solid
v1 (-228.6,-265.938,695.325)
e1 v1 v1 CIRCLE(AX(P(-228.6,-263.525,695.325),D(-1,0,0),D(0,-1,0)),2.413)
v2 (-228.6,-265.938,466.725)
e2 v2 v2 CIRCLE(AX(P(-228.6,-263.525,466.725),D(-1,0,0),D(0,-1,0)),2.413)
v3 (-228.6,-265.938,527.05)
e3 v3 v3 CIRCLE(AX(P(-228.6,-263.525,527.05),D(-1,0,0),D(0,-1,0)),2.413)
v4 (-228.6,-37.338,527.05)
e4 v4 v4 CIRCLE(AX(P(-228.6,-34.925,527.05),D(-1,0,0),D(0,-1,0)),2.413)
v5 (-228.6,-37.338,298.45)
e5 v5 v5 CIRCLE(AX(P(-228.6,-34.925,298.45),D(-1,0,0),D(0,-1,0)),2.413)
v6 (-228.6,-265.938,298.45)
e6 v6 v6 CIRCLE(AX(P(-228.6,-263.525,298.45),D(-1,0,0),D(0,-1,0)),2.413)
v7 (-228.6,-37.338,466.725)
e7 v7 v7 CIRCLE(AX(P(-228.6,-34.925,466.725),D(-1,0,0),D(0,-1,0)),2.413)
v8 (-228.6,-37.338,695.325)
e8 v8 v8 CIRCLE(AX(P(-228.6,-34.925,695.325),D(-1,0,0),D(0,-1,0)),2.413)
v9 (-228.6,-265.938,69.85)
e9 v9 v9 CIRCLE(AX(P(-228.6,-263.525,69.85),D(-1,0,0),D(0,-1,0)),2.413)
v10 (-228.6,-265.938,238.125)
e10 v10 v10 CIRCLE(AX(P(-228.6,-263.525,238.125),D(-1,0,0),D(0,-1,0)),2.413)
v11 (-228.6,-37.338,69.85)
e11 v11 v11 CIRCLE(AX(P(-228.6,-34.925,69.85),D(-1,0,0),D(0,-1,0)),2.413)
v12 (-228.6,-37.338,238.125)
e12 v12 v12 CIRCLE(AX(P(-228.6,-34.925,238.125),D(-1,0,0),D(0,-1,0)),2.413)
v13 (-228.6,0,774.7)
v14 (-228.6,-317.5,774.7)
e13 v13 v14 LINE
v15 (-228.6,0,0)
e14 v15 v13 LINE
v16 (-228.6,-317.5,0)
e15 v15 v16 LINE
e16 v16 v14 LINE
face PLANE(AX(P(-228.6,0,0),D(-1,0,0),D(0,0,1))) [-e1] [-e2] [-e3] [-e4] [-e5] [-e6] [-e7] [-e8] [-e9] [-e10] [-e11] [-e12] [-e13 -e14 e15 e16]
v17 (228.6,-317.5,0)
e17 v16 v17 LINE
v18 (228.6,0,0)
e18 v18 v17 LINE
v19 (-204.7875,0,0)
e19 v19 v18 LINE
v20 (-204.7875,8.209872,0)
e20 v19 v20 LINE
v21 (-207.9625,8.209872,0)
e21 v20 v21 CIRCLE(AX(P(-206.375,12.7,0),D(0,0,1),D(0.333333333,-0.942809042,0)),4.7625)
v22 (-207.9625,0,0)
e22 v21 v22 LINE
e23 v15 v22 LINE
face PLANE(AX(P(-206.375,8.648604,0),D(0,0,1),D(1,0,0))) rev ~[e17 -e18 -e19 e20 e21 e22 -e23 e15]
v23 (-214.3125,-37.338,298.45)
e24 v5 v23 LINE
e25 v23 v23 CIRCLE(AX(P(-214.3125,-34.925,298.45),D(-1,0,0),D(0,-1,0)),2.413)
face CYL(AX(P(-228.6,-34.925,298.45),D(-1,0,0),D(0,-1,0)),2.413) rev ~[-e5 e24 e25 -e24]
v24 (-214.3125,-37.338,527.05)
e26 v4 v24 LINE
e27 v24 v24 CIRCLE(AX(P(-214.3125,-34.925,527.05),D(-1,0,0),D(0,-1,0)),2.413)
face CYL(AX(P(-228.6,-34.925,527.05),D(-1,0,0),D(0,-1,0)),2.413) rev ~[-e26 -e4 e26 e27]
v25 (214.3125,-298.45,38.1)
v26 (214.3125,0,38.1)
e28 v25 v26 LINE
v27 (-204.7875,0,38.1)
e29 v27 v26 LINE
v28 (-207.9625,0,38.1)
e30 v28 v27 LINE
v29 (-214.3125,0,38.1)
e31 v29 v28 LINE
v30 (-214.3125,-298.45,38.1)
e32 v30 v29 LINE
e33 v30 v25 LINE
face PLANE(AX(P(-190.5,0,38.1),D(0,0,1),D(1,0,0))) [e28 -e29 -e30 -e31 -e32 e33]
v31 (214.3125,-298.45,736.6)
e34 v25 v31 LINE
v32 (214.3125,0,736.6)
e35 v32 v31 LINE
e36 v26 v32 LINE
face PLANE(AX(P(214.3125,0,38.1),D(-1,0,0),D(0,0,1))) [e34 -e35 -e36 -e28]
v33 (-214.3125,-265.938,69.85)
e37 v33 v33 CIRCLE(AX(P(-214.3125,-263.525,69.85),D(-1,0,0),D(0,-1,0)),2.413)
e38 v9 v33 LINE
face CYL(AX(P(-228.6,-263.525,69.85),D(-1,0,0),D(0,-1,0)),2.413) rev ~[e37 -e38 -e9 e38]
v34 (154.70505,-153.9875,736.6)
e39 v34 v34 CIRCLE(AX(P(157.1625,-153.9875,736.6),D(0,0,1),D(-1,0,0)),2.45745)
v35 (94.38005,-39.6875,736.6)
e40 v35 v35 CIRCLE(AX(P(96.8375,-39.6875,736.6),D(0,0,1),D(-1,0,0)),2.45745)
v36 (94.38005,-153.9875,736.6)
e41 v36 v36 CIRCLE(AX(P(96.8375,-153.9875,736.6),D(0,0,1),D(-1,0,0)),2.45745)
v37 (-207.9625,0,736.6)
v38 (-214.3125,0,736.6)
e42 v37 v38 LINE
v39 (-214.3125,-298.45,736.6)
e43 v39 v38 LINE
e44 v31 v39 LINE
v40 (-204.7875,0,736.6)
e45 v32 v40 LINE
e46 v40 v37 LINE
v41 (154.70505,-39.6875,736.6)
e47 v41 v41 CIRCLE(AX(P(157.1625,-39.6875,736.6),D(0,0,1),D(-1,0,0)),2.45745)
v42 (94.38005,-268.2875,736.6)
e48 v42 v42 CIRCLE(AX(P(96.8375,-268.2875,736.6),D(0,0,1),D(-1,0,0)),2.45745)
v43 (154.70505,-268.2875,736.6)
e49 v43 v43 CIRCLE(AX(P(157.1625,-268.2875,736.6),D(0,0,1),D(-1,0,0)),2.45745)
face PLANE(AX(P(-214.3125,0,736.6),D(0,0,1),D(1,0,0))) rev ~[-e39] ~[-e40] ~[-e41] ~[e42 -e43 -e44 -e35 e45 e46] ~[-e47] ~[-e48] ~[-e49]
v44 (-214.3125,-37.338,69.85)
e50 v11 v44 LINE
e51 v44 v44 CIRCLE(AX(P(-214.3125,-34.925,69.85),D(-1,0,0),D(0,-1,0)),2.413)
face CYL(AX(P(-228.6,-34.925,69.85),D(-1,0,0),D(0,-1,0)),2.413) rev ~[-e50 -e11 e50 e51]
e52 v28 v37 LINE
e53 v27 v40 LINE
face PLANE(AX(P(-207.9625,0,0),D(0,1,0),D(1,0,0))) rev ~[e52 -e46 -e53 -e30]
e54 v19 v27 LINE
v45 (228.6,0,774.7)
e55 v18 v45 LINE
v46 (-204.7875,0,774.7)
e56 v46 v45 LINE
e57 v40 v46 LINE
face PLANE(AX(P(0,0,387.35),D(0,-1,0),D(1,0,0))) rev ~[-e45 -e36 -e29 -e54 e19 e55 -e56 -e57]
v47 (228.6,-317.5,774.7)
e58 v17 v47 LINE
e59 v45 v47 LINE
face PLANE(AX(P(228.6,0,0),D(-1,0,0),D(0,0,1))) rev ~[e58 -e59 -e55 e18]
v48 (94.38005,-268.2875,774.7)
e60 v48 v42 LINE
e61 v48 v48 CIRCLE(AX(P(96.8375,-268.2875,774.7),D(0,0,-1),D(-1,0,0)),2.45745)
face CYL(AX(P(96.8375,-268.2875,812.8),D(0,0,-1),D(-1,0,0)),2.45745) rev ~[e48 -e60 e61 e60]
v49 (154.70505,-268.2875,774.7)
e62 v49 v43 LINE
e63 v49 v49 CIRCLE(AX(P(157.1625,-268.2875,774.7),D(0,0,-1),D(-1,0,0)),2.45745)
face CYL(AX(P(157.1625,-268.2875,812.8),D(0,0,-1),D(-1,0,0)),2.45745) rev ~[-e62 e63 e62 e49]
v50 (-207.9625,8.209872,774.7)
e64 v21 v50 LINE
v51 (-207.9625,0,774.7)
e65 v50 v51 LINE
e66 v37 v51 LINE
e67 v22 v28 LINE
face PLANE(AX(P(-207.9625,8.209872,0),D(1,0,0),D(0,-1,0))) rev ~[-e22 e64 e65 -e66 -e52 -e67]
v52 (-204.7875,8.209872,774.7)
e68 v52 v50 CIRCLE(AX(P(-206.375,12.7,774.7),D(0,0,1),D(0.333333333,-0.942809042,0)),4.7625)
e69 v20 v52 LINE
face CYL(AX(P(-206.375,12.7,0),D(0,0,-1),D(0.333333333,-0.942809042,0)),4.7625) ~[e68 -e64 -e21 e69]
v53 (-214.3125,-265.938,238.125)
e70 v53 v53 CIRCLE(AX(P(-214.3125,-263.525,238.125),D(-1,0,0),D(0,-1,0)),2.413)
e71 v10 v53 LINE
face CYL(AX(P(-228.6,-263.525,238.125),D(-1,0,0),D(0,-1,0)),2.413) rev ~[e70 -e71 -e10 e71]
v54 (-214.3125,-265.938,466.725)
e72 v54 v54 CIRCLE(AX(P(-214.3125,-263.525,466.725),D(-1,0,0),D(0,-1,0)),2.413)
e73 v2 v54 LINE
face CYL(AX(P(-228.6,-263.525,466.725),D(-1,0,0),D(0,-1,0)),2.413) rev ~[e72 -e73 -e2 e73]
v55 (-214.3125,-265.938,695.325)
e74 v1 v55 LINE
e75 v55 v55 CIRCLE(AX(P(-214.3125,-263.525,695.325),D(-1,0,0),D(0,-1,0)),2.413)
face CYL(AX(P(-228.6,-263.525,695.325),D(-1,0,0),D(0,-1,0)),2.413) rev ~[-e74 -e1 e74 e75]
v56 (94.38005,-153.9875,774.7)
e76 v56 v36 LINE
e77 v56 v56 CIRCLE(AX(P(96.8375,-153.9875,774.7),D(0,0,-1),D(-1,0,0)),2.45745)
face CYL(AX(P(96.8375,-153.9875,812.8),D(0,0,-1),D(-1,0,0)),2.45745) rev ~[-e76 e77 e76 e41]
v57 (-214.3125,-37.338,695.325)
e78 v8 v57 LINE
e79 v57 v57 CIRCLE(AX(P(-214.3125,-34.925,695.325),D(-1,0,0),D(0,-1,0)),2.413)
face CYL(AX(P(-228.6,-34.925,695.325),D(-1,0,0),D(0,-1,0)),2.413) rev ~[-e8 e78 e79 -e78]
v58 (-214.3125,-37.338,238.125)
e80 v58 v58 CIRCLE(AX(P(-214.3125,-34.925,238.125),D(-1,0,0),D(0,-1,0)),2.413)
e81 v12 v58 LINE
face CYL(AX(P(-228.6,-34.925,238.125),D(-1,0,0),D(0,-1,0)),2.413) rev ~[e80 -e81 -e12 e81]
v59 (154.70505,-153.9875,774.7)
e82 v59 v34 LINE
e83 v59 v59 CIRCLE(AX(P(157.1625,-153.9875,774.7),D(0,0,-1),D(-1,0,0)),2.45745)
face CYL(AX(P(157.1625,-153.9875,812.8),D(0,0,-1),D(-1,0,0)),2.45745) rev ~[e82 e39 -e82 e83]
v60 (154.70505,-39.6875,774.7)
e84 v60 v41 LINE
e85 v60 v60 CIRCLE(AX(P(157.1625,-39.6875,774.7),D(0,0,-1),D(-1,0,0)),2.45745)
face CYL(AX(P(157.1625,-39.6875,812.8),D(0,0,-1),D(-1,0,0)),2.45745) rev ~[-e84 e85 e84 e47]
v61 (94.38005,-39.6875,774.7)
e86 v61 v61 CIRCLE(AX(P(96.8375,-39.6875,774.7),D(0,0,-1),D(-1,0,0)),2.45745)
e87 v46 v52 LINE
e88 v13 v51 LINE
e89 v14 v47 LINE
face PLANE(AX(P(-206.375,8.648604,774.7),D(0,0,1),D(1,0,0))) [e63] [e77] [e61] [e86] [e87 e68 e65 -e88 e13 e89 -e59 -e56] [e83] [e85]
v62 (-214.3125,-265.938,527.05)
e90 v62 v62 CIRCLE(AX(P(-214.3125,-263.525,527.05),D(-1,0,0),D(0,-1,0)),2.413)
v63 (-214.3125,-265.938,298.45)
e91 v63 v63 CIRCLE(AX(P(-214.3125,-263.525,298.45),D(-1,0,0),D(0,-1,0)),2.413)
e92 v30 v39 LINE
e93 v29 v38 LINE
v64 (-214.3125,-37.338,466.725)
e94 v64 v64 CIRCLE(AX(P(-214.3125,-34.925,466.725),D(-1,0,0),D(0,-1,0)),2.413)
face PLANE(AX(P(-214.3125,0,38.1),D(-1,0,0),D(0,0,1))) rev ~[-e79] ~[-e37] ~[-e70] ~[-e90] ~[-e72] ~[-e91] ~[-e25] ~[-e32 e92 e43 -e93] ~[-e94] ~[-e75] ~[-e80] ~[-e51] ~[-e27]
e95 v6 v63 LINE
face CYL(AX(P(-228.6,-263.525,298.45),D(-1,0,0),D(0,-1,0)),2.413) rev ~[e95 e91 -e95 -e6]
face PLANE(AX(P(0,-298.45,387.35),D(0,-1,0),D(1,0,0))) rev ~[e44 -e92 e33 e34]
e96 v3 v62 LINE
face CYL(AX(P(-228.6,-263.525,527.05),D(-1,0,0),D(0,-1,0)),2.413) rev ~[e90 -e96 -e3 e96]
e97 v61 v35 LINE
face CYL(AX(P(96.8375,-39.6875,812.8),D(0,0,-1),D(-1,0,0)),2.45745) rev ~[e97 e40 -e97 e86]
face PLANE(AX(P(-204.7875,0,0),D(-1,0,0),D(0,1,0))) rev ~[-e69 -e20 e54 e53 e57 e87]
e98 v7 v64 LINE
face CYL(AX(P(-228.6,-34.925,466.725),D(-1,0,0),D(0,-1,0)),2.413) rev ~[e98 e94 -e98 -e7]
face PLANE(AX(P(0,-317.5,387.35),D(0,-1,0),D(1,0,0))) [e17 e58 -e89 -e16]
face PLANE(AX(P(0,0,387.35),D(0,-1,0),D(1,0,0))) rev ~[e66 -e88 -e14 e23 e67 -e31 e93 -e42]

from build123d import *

# Parameters (mm, degrees)
F0_W      = 457.2
F0_H      = 774.7
F1_DEPTH  = 317.5
F2_W      = 381
F2_H      = 698.5
F3_W      = 428.625
F3_H      = 698.5
F4_DEPTH  = 298.45
F5_START  = 19.05
F5_DEPTH  = 279.4
F7_DEPTH  = 774.7
F9_D      = 4.9149
F9_DEPTH  = 38.1
F9_TIP    = 1.4765849282
F10_R     = 2.413
F11_DEPTH = 25.4


# Not quite as in the source:
# - a feature names something its author has since deleted; it is built from what else it names


with BuildPart() as f1:
    # F0 (on Front) → F1 (new body)
    with BuildSketch(Plane.XZ):
        with Locations((0, 387.35)):
            Rectangle(F0_W, F0_H)
    extrude(amount=F1_DEPTH)

    # F2 (on Front) + F3 (on Front) → F4 (cut)
    with BuildSketch(Plane.XZ):
        with Locations((0, 387.35)):
            Rectangle(F2_W, F2_H)
    with BuildSketch(Plane.XZ):
        with Locations((0, 387.35)):
            Rectangle(F3_W, F3_H)
    extrude(amount=F4_DEPTH, mode=Mode.SUBTRACT)

    # F3 (on Front) → F5 (cut)
    with BuildSketch(Plane.XZ.offset(F5_START)):
        with Locations((0, 387.35)):
            Rectangle(F3_W, F3_H)
    extrude(amount=F5_DEPTH, mode=Mode.SUBTRACT)

    # F6 (on Top) → F7 (join, through all)
    with BuildSketch(Plane.XY):
        with BuildLine():
            Line((-204.7875, 0), (-204.7875, 8.2098719395))
            ThreePointArc((-204.7875, 8.2098719395), (-206.375, 17.4625), (-207.9625, 8.2098719395))
            Line((-207.9625, 8.2098719395), (-207.9625, 0))
            Line((-207.9625, 0), (-204.7875, 0))
        make_face()
    extrude(amount=F7_DEPTH)

    # F9
    with Locations(Plane.XY.offset(774.7)):
        with Locations((96.8375, -153.9875), (157.1625, -39.6875), (157.1625, -153.9875), (96.8375, -268.2875), (96.8375, -39.6875), (157.1625, -268.2875)):
            Hole(F9_D / 2, depth=F9_DEPTH)
            with Locations((0, 0, -(F9_DEPTH + F9_TIP / 2))):  # 118° drill point
                Cone(0, F9_D / 2, F9_TIP, mode=Mode.SUBTRACT)

    # F10 (on face) → F11 (cut)
    with BuildSketch(Plane(origin=(-228.6, 0, 0), x_dir=(0, -1, 0), z_dir=(-1, 0, 0))):
        with Locations((34.925, 695.325)):
            Circle(F10_R)
        with Locations((34.925, 527.05)):
            Circle(F10_R)
        with Locations((34.925, 466.725)):
            Circle(F10_R)
        with Locations((34.925, 298.45)):
            Circle(F10_R)
        with Locations((34.925, 238.125)):
            Circle(F10_R)
        with Locations((34.925, 69.85)):
            Circle(F10_R)
        with Locations((263.525, 69.85)):
            Circle(F10_R)
        with Locations((263.525, 238.125)):
            Circle(F10_R)
        with Locations((263.525, 298.45)):
            Circle(F10_R)
        with Locations((263.525, 466.725)):
            Circle(F10_R)
        with Locations((263.525, 527.05)):
            Circle(F10_R)
        with Locations((263.525, 695.325)):
            Circle(F10_R)
    extrude(amount=-F11_DEPTH, mode=Mode.SUBTRACT)


solid = f1.part
